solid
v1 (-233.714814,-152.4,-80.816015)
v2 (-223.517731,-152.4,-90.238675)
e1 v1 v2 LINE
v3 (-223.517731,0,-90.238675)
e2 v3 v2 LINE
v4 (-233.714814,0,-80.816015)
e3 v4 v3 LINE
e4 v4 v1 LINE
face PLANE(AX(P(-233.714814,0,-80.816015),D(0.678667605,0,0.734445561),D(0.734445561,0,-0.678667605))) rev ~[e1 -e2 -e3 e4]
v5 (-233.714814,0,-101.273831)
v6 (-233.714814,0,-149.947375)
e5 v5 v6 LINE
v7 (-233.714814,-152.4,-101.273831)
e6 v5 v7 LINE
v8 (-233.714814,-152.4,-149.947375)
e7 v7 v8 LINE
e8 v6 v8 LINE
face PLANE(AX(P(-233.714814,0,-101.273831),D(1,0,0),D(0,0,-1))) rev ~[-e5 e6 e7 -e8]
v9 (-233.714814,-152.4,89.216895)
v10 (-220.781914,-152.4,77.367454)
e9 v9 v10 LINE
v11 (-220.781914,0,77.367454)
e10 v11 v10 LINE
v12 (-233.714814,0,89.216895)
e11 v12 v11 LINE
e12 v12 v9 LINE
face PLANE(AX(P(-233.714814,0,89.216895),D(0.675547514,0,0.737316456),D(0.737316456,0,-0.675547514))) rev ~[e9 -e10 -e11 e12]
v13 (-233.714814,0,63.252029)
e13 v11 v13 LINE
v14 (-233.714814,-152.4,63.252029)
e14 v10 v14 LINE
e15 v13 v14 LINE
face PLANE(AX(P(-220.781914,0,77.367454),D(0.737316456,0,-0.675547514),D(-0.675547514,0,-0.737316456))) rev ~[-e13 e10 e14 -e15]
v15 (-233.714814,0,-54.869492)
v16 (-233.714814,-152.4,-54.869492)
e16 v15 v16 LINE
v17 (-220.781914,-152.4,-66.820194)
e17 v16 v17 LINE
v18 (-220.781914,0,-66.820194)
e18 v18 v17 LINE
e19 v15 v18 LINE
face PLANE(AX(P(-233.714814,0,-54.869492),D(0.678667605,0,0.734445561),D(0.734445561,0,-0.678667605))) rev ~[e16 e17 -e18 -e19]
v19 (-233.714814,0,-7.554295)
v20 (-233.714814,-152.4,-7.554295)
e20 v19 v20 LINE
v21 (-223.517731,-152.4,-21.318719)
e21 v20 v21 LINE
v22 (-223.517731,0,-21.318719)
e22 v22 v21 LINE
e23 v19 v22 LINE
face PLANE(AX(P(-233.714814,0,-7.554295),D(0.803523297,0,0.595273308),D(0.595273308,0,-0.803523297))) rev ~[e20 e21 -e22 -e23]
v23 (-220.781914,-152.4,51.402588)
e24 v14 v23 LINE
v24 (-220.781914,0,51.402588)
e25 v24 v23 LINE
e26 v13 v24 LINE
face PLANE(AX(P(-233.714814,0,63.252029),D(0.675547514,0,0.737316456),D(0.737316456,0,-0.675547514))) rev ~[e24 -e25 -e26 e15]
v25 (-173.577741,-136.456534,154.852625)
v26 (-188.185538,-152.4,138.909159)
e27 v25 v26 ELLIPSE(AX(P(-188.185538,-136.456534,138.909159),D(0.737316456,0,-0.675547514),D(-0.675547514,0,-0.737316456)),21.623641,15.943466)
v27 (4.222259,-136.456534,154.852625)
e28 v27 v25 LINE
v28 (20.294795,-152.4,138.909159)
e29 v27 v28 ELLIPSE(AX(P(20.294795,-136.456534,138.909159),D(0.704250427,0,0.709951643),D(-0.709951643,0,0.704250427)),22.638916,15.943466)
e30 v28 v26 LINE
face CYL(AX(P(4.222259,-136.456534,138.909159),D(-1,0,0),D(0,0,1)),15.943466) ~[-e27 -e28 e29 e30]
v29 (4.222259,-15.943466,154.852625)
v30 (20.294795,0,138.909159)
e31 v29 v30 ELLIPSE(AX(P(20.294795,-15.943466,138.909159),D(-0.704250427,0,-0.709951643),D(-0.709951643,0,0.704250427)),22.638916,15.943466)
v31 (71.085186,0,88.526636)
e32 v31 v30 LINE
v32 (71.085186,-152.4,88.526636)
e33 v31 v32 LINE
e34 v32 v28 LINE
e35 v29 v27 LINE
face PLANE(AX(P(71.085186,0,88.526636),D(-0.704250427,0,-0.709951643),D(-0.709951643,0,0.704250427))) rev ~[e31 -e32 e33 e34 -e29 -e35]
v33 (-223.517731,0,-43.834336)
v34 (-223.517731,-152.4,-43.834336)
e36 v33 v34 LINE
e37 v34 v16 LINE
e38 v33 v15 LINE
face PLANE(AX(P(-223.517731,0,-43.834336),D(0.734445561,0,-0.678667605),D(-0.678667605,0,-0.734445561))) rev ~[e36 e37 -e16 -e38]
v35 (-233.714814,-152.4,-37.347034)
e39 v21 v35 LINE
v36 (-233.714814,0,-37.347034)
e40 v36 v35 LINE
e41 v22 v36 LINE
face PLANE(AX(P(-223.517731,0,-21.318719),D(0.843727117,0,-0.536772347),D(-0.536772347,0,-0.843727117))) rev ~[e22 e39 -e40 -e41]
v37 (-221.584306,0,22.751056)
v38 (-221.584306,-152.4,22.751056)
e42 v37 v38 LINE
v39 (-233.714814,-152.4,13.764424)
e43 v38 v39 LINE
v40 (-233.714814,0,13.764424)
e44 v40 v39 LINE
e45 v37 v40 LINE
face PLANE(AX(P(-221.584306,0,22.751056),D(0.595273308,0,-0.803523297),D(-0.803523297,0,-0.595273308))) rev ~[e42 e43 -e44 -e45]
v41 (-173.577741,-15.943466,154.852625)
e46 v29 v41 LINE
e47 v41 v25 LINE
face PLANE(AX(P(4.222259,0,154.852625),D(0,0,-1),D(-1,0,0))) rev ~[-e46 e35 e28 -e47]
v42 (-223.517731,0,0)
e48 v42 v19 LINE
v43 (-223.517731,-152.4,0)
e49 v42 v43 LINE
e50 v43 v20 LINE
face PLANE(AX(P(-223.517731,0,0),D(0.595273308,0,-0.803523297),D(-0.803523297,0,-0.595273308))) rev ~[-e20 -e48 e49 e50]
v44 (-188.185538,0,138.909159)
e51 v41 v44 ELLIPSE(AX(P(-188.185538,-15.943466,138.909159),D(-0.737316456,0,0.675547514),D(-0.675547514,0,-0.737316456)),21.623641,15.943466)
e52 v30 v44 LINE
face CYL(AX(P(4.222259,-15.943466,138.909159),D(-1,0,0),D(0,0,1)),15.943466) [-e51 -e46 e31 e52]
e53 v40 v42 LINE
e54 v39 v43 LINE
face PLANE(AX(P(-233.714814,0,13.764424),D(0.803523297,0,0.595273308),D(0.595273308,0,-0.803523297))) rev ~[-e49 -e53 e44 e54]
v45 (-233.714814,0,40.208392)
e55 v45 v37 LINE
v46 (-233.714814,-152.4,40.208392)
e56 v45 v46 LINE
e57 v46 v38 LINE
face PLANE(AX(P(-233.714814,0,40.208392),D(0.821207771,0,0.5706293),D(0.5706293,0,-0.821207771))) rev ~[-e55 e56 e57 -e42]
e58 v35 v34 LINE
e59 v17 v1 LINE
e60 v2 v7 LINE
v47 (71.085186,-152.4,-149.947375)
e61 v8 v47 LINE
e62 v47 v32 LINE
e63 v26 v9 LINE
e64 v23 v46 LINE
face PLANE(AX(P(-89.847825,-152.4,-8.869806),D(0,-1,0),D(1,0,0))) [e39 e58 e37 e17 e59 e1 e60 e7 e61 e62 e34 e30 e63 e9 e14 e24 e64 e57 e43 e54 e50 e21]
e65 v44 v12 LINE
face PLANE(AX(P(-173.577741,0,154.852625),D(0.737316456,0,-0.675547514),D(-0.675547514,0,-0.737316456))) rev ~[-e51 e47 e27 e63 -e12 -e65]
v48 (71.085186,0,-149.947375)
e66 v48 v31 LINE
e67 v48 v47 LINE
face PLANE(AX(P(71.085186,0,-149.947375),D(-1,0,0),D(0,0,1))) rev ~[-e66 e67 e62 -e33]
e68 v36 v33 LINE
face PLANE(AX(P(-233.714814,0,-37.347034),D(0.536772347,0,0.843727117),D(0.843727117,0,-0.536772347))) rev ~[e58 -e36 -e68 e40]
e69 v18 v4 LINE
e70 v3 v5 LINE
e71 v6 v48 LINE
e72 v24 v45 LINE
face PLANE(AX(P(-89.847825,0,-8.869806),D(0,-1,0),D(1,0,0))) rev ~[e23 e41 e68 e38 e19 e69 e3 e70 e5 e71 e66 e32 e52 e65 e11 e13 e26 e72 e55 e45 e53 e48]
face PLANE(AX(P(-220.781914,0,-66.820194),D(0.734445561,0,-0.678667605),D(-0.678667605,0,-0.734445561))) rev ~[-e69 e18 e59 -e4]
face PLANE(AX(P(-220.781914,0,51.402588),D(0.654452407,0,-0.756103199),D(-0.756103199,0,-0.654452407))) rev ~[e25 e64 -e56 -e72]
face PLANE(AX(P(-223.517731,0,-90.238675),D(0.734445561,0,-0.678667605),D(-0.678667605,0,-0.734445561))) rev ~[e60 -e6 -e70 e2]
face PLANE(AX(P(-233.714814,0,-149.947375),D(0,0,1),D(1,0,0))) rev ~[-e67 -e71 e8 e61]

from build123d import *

# Parameters (mm, degrees)
F1_DEPTH = 152.4
F2_R     = 15.9434663659


# Not quite as in the source:
# - a feature names something its author has since deleted; it is built from what else it names


with BuildPart() as f1:
    # F0 (on Front) → F1 (new body)
    with BuildSketch(Plane.XZ):
        Polygon((-233.7148142715, -101.2738309481), (-233.7148142715, -149.9473750383), (71.0851857285, -149.9473750383), (71.0851857285, 44.3499535322), (71.0851857285, 88.5266363621), (4.2222592115, 154.8526249617), (-173.5777407885, 154.8526249617), (-233.7148142715, 89.2168954015), (-220.7819144912, 77.3674537994), (-233.7148142715, 63.2520294323), (-220.7819144912, 51.4025878302), (-233.7148142715, 40.2083918452), (-221.5843061602, 22.7510556579), (-233.7148142715, 13.7644242495), (-223.5177305101, 0), (-233.7148142715, -7.5542947057), (-223.5177305101, -21.3187189553), (-233.7148142715, -37.3470336199), (-223.5177305101, -43.8343355859), (-233.7148142715, -54.8694915965), (-220.7819144912, -66.8201937171), (-233.7148142715, -80.8160154721), (-223.5177305101, -90.2386749375), align=None)
    extrude(amount=F1_DEPTH)

    # F2
    f2_edges = [f1.edges().sort_by_distance(p)[0] for p in [
        (-84.677741, -152.4, 154.852625),
        (-84.677741, 0, 154.852625),
    ]]
    fillet(f2_edges, radius=F2_R)


solid = f1.part
